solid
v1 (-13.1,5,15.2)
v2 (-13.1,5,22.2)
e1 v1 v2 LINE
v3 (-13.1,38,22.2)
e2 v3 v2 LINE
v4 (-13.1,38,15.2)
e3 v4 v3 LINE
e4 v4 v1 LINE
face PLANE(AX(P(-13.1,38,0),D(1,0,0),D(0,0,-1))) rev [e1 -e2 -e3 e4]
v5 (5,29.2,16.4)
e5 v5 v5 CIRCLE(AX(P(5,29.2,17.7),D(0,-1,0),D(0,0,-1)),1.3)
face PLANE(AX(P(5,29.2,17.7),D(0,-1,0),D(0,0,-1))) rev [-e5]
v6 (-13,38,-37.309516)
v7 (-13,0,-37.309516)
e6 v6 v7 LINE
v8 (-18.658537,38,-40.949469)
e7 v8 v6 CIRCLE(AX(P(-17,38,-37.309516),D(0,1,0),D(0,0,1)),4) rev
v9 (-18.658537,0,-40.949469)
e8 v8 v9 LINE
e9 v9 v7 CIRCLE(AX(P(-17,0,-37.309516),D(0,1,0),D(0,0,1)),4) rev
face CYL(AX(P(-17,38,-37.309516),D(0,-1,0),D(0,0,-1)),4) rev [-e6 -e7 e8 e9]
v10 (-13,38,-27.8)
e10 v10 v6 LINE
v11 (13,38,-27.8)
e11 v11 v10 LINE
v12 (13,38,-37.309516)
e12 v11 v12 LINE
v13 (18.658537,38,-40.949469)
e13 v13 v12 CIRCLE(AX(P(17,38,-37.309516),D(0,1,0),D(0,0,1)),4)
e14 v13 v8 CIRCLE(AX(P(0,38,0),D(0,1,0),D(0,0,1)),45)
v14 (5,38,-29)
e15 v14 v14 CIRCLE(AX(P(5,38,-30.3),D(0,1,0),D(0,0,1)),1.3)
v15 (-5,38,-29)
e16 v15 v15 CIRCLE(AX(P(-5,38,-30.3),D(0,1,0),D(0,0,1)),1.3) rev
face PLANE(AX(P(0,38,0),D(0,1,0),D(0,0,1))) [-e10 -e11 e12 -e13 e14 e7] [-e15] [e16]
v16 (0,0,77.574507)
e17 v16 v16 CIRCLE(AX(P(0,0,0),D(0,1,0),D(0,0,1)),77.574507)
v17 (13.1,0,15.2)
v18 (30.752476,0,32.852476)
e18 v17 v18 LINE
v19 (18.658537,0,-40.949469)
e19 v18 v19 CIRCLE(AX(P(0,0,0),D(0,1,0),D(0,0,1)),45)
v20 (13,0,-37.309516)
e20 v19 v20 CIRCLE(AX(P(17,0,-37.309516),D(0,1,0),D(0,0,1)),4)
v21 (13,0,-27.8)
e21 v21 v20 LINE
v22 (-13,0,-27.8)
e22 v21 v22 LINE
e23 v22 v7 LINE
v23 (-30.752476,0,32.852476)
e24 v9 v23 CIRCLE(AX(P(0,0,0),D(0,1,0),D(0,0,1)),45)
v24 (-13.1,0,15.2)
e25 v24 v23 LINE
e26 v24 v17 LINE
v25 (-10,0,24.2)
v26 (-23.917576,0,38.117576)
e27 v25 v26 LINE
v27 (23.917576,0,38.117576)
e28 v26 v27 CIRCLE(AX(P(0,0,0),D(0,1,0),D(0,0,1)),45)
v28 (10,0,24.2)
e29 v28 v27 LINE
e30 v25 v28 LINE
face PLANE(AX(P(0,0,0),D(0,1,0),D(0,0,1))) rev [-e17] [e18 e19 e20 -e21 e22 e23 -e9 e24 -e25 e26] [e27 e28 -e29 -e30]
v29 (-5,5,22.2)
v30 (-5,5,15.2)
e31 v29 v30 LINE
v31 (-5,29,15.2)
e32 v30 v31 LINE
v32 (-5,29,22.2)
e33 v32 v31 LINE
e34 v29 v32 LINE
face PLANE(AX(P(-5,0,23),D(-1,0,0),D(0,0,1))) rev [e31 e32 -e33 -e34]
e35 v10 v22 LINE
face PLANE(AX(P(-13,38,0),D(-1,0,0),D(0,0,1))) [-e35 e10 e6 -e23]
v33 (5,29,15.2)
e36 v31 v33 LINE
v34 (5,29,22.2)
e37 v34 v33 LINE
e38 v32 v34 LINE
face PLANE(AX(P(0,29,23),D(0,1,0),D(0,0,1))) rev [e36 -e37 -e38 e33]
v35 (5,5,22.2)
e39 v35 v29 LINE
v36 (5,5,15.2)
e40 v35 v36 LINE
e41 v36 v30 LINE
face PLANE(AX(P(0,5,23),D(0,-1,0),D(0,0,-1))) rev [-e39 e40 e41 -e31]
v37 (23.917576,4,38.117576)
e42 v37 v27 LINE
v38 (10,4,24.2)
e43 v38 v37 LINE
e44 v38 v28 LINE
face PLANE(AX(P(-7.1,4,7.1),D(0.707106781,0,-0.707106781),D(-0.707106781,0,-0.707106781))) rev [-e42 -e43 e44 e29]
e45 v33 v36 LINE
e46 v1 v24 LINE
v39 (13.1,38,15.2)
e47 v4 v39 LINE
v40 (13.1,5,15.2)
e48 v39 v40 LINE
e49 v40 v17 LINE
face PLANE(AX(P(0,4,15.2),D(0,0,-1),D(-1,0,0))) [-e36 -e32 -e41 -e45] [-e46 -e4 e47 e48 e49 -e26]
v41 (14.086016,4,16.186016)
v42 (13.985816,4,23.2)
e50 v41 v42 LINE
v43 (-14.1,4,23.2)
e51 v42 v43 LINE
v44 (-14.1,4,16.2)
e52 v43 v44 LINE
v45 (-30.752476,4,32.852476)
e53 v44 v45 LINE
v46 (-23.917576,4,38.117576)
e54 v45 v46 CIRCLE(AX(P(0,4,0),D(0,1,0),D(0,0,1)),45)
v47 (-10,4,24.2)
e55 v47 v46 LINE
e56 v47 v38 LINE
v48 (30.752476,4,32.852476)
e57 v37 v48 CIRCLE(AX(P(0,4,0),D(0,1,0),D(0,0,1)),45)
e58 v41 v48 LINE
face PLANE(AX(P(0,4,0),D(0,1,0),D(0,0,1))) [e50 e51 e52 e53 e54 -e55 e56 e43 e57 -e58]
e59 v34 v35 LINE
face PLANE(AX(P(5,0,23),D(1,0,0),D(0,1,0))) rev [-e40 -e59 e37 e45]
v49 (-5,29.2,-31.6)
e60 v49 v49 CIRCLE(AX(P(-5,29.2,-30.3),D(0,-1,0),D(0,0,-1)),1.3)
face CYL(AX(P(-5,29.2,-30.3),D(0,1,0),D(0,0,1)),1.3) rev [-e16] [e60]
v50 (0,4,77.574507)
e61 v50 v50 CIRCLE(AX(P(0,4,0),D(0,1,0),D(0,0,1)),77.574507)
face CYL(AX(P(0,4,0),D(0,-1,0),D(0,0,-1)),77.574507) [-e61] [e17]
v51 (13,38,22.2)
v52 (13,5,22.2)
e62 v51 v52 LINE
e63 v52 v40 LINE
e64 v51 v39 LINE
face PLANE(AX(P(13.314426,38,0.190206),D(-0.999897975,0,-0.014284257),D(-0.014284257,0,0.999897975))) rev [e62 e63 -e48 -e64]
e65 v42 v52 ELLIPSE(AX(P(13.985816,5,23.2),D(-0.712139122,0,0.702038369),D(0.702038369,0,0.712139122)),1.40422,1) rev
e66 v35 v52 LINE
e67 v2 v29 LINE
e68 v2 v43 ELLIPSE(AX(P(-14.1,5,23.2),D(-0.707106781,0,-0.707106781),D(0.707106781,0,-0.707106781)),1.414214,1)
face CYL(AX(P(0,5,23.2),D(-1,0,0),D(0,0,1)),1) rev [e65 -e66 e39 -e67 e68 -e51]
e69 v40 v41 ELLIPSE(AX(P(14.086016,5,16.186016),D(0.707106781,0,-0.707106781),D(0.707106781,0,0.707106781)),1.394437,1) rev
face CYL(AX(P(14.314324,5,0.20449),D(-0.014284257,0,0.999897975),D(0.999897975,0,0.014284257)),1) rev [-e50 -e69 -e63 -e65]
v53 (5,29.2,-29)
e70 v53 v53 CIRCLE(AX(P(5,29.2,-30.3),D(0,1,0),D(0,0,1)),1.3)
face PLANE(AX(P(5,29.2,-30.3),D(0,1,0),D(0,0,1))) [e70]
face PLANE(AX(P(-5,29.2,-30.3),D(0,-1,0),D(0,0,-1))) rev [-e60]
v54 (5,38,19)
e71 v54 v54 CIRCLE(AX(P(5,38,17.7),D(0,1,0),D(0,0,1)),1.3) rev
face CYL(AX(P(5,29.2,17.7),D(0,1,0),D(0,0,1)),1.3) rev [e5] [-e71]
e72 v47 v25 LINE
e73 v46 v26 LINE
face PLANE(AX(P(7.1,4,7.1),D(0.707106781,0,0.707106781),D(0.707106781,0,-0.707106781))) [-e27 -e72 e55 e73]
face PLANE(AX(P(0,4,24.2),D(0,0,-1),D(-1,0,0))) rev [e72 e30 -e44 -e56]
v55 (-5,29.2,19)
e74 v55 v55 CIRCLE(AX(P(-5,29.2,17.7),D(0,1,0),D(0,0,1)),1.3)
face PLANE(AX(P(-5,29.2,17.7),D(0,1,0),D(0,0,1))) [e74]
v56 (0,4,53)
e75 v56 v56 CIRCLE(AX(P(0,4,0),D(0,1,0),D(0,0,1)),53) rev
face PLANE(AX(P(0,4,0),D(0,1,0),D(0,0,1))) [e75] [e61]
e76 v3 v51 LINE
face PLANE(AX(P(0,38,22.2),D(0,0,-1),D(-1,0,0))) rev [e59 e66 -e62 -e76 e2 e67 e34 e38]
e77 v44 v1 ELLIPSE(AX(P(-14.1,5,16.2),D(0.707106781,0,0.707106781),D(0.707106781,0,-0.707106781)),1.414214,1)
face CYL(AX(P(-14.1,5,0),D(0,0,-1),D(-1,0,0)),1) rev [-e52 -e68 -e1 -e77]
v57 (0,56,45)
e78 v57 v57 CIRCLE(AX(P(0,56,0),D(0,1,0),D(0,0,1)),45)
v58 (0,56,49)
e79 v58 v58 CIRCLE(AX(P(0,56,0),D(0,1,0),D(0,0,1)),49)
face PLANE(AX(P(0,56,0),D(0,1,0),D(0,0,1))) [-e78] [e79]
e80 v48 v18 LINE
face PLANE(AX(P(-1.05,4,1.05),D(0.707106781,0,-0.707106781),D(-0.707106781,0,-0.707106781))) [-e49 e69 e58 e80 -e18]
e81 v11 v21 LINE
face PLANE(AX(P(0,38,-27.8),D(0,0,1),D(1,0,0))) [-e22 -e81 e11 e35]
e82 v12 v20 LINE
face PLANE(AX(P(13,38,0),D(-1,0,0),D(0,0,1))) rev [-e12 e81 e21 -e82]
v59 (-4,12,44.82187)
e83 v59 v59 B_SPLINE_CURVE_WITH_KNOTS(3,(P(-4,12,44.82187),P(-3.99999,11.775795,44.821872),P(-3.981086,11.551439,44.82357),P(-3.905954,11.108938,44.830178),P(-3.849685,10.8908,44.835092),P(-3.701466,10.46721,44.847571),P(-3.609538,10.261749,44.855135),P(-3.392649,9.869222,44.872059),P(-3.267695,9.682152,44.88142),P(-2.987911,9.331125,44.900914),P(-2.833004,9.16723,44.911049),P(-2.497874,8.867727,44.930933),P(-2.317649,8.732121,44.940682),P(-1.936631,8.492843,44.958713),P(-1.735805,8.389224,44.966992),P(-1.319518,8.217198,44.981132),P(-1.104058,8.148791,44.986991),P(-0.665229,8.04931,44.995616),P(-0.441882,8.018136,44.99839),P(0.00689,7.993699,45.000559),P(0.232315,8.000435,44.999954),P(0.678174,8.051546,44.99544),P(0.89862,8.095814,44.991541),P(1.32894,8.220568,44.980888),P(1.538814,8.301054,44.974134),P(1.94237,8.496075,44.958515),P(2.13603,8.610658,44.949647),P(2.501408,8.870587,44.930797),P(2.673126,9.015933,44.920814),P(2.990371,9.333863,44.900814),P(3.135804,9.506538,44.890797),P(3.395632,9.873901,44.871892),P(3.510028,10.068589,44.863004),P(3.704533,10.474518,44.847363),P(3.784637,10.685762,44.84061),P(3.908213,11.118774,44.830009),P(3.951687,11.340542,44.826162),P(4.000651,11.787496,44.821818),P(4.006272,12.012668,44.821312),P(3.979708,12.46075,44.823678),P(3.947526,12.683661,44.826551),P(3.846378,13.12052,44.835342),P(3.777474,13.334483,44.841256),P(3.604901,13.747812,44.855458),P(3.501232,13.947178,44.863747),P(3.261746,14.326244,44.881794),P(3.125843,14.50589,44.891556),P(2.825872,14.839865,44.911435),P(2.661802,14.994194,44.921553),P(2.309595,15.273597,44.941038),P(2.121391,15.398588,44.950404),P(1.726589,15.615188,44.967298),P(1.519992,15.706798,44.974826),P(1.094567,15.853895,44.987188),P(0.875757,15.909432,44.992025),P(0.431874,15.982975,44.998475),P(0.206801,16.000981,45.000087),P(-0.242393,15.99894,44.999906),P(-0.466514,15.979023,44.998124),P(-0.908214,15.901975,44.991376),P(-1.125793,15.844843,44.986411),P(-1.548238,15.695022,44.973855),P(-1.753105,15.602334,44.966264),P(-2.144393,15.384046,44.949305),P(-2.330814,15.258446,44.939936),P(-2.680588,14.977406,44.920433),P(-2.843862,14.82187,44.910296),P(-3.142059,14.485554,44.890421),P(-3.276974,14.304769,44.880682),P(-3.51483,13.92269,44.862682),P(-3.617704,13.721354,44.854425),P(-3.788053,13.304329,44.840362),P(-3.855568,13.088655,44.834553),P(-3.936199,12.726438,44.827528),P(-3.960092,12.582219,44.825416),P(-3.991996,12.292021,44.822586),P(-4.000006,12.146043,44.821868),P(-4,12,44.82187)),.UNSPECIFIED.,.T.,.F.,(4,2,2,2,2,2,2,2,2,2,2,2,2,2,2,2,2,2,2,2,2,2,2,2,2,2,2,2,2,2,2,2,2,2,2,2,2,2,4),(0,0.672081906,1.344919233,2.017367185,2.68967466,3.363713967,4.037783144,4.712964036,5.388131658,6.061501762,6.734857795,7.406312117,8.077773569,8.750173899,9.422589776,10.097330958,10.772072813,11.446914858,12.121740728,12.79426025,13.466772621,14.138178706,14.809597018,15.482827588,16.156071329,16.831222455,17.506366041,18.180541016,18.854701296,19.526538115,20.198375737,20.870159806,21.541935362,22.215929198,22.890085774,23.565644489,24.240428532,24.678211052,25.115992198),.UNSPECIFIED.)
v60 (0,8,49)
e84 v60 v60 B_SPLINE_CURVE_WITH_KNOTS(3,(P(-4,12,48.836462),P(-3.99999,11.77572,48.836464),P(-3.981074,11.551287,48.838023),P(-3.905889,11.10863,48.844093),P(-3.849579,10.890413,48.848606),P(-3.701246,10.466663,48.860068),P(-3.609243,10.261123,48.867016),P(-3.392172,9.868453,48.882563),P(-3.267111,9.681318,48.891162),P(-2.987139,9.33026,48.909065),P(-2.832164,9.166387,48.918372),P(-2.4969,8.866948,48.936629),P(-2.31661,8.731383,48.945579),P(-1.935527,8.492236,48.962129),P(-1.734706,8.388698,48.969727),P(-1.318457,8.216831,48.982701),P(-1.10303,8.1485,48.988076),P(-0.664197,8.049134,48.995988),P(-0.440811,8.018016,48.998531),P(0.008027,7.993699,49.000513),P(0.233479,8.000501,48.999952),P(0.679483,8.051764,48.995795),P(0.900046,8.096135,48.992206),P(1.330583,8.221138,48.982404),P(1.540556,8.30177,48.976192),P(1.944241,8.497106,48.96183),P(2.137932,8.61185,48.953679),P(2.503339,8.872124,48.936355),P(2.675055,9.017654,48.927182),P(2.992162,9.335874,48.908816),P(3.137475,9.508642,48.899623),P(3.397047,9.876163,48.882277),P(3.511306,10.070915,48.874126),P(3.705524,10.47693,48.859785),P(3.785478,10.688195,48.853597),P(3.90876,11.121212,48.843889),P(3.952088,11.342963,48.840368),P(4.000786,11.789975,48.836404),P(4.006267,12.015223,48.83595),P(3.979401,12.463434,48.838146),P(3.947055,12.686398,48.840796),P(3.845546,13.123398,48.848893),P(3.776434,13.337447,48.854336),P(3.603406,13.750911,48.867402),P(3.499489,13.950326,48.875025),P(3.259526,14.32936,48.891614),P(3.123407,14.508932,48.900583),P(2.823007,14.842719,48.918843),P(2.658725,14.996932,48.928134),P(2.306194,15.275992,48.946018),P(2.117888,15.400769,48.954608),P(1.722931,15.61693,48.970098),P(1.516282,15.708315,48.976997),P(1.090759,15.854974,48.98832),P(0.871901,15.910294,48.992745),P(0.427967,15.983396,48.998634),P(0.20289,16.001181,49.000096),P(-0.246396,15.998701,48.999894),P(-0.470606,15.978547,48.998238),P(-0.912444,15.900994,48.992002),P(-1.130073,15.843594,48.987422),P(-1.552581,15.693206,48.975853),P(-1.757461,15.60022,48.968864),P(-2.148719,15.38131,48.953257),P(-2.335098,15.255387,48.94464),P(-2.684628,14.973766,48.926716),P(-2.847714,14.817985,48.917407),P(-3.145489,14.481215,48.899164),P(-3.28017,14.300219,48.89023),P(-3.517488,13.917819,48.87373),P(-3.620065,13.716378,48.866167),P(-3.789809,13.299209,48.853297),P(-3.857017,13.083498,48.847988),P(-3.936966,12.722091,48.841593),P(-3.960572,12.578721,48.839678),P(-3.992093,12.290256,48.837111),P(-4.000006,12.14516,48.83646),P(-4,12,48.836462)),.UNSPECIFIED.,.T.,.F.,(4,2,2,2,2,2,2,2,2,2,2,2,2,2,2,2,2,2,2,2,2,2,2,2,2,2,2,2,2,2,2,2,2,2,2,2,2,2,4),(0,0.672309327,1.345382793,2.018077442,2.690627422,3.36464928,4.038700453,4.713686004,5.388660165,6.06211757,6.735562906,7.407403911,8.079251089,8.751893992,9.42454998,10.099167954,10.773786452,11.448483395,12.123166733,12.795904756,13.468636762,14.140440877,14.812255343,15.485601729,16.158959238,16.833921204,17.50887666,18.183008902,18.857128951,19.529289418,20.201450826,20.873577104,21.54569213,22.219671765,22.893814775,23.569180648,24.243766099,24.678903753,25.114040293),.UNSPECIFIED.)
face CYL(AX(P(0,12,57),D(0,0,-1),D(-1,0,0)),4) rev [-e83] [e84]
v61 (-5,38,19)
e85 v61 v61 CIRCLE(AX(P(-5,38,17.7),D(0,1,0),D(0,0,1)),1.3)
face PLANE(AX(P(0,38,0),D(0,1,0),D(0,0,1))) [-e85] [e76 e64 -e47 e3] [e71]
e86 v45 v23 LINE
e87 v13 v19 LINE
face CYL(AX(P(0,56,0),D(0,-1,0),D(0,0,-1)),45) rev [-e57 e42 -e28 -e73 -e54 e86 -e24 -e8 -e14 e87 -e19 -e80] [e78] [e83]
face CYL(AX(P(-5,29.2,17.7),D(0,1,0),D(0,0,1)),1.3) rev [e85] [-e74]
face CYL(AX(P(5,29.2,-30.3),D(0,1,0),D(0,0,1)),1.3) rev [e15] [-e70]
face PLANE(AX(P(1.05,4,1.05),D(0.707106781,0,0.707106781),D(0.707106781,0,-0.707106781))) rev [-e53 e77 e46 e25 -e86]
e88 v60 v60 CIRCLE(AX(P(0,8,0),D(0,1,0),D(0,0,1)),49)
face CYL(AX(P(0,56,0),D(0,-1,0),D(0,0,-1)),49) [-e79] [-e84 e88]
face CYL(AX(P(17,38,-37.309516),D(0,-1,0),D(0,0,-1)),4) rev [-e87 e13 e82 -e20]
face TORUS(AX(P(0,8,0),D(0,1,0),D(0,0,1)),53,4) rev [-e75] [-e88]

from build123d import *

# Parameters (mm, degrees)
CROQUIS3_R              = 49
CROQUIS3_R_2            = 45
SALIENTE_EXTRUIR1_DEPTH = 56
CROQUIS1_R              = 77.574507489
SALIENTE_EXTRUIR2_DEPTH = 4
SALIENTE_EXTRUIR3_DEPTH = 38
CORTAR_EXTRUIR1_DEPTH   = 8
CROQUIS7_R              = 4
CORTAR_EXTRUIR2_DEPTH   = 42
REDONDEO1_R             = 4
REDONDEO2_R             = 1
CROQUIS8_R              = 1.3
CORTAR_EXTRUIR3_DEPTH   = 30.8


with BuildPart() as part:
    # Croquis3 → Saliente-Extruir1 (new body)
    with BuildSketch(Plane(origin=(0, 0, 0), x_dir=(1, 0, 0), z_dir=(0, 1, 0))):
        with Locations(Location((0, 0, 0), (0, 0, 270))):
            Circle(CROQUIS3_R)
        with Locations(Location((0, 0, 0), (0, 0, 270))):
            Circle(CROQUIS3_R_2, mode=Mode.SUBTRACT)
    extrude(amount=SALIENTE_EXTRUIR1_DEPTH)

    # Croquis1 → Saliente-Extruir2 (add)
    with BuildSketch(Plane(origin=(0, 0, 0), x_dir=(1, 0, 0), z_dir=(0, 1, 0))):
        with Locations(Location((0, 0, 0), (0, 0, 270))):
            Circle(CROQUIS1_R)
        with BuildLine():
            Line((-23.917575663, -38.117575663), (-10, -24.2))
            Line((-10, -24.2), (0, -24.2))
            Line((0, -24.2), (10, -24.2))
            Line((10, -24.2), (23.917575663, -38.117575663))
            ThreePointArc((23.917575663, -38.117575663), (12.444056717, -43.245178372), (0, -45))
            ThreePointArc((0, -45), (-6.760954384, -44.489206509), (-13.368422036, -42.968422036))
            ThreePointArc((-13.368422036, -42.968422036), (-15.776603613, -42.143786949), (-18.134305032, -41.184305032))
            ThreePointArc((-18.134305032, -41.184305032), (-21.081778264, -39.756240079), (-23.917575663, -38.117575663))
        make_face(mode=Mode.SUBTRACT)
        with BuildLine():
            Line((13.1, -15.2), (0, -15.2))
            Line((0, -15.2), (-13.1, -15.2))
            Line((-13.1, -15.2), (-30.752476319, -32.852476319))
            ThreePointArc((-30.752476319, -32.852476319), (-7.771708829, 44.323814613), (40.095012748, -20.430123659))
            ThreePointArc((40.095012748, -20.430123659), (37.628495356, -24.679877173), (34.713332708, -28.635372048))
            ThreePointArc((34.713332708, -28.635372048), (32.8007474, -30.807644668), (30.752476319, -32.852476319))
            Line((30.752476319, -32.852476319), (13.1, -15.2))
        make_face(mode=Mode.SUBTRACT)
    extrude(amount=SALIENTE_EXTRUIR2_DEPTH)

    # Croquis5 → Saliente-Extruir3 (add)
    with BuildSketch(Plane(origin=(0, 0, 0), x_dir=(1, 0, 0), z_dir=(0, 1, 0))):
        with BuildLine():
            ThreePointArc((18.658536585, 40.949469014), (14.835992877, 40.673601998), (13, 37.309516212))
            Line((13, 37.309516212), (13, 27.8))
            Line((13, 27.8), (0, 27.8))
            Line((0, 27.8), (-13, 27.8))
            Line((-13, 27.8), (-13, 37.309516212))
            ThreePointArc((-13, 37.309516212), (-14.835992877, 40.673601998), (-18.658536585, 40.949469014))
            ThreePointArc((-18.658536585, 40.949469014), (0, 45), (18.658536585, 40.949469014))
        make_face()
        Polygon((-13.1, -15.2), (13.1, -15.2), (13, -22.2), (-13.1, -22.2), align=None)
    extrude(amount=SALIENTE_EXTRUIR3_DEPTH)

    # Croquis6 → Cortar-Extruir1 (cut)
    with BuildSketch(Plane.XY.offset(15)):
        Polygon((5, 5), (0, 5), (-5, 5), (-5, 29), (-2.492829293, 29), (5, 29), align=None)
    extrude(amount=CORTAR_EXTRUIR1_DEPTH, mode=Mode.SUBTRACT)

    # Croquis7 → Cortar-Extruir2 (cut)
    with BuildSketch(Plane.XY.offset(15)):
        with Locations(Location((0, 12, 0), (0, 0, 180))):
            Circle(CROQUIS7_R)
    extrude(amount=CORTAR_EXTRUIR2_DEPTH, mode=Mode.SUBTRACT)

    # Redondeo1
    redondeo1_edges = [part.edges().sort_by_distance(p)[0] for p in [
        (0, 4, -49),
    ]]
    fillet(redondeo1_edges, radius=REDONDEO1_R)

    # Redondeo2
    # the kernel refuses this fillet: 1 mm, written as the material it adds along each edge
    with BuildSketch(Plane(origin=(-13.1, 4, 22.2), x_dir=(0, 0, 1), z_dir=(1, 0, 0))) as redondeo2_piece_1_section:
        with BuildLine():
            CenterArc((REDONDEO2_R, -REDONDEO2_R), REDONDEO2_R, 90, 90)
            Line((0, -REDONDEO2_R), (0, 0))
            Line((0, 0), (REDONDEO2_R, 0))
        make_face()
    redondeo2_piece_1 = extrude(amount=28.6, mode=Mode.PRIVATE)
    redondeo2_piece_1 = split(redondeo2_piece_1, bisect_by=Plane(origin=(12.992267362, 4.226395114, 22.741284648), z_dir=(-0.99989797479951, 0, -0.014284256782850096)), keep=Keep.TOP, mode=Mode.PRIVATE)
    add(redondeo2_piece_1)
    with BuildSketch(Plane(origin=(12.964289358, 4, 24.699744937), x_dir=(0.99989797479951, 0, 0.014284256782850096), z_dir=(0.014284256782850096, 0, -0.99989797479951))) as redondeo2_piece_2_section:
        with BuildLine():
            CenterArc((REDONDEO2_R, -REDONDEO2_R), REDONDEO2_R, 90, 90)
            Line((0, -REDONDEO2_R), (0, 0))
            Line((0, 0), (REDONDEO2_R, 0))
        make_face()
    redondeo2_piece_2 = extrude(amount=12.000714249, mode=Mode.PRIVATE)
    redondeo2_piece_2 = split(redondeo2_piece_2, bisect_by=Plane(origin=(14.988415496, 4.230359827, 17.088415496), z_dir=(-0.7071067811865411, 0, 0.7071067811865539)), keep=Keep.TOP, mode=Mode.PRIVATE)
    redondeo2_piece_2 = split(redondeo2_piece_2, bisect_by=Plane(origin=(13.268129446, 4.230359827, 15.2), z_dir=(0, 0, 1)), keep=Keep.TOP, mode=Mode.PRIVATE)
    redondeo2_piece_2 = split(redondeo2_piece_2, bisect_by=Plane(origin=(13.268129446, 4.230359827, 22.2), z_dir=(0, 0, -1)), keep=Keep.TOP, mode=Mode.PRIVATE)
    add(redondeo2_piece_2)
    with BuildSketch(Plane(origin=(-13.1, 4, 15.2), x_dir=(-1, 0, 0), z_dir=(0, 0, 1))) as redondeo2_piece_3_section:
        with BuildLine():
            CenterArc((REDONDEO2_R, -REDONDEO2_R), REDONDEO2_R, 90, 90)
            Line((0, -REDONDEO2_R), (0, 0))
            Line((0, 0), (REDONDEO2_R, 0))
        make_face()
    redondeo2_piece_3 = extrude(amount=7, mode=Mode.PRIVATE)
    redondeo2_piece_3 = split(redondeo2_piece_3, bisect_by=Plane(origin=(-15.014877598, 4.230417942, 17.114877598), z_dir=(0.7071067811865538, 0, 0.7071067811865414)), keep=Keep.TOP, mode=Mode.PRIVATE)
    add(redondeo2_piece_3)
    with BuildSketch(Plane(origin=(-13.1, 4, 15.2), x_dir=(-1, 0, 0), z_dir=(0, 0, 1))) as redondeo2_piece_4a_section:
        with BuildLine():
            CenterArc((REDONDEO2_R, -REDONDEO2_R), REDONDEO2_R, 90, 90)
            Line((0, -REDONDEO2_R), (0, 0))
            Line((0, 0), (REDONDEO2_R, 0))
        make_face()
    redondeo2_piece_4a = extrude(amount=9.5, mode=Mode.PRIVATE)
    redondeo2_piece_4a = split(redondeo2_piece_4a, bisect_by=Plane(origin=(-13.326395114, 4.226395114, 22.2), z_dir=(0, 0, 1)), keep=Keep.TOP, mode=Mode.PRIVATE)
    with BuildSketch(Plane(origin=(-15.6, 4, 22.2), x_dir=(0, 0, 1), z_dir=(1, 0, 0))) as redondeo2_piece_4b_section:
        with BuildLine():
            CenterArc((REDONDEO2_R, -REDONDEO2_R), REDONDEO2_R, 90, 90)
            Line((0, -REDONDEO2_R), (0, 0))
            Line((0, 0), (REDONDEO2_R, 0))
        make_face()
    redondeo2_piece_4b = extrude(amount=31.1, mode=Mode.PRIVATE)
    redondeo2_piece_4b = split(redondeo2_piece_4b, bisect_by=Plane(origin=(-13.1, 4.226395114, 22.426395114), z_dir=(-1, 0, 0)), keep=Keep.TOP, mode=Mode.PRIVATE)
    redondeo2_piece_4 = redondeo2_piece_4a & redondeo2_piece_4b
    add(redondeo2_piece_4)
    with BuildSketch(Plane(origin=(-13.1, 4, 22.2), x_dir=(0, 0, 1), z_dir=(1, 0, 0))) as redondeo2_piece_5a_section:
        with BuildLine():
            CenterArc((REDONDEO2_R, -REDONDEO2_R), REDONDEO2_R, 90, 90)
            Line((0, -REDONDEO2_R), (0, 0))
            Line((0, 0), (REDONDEO2_R, 0))
        make_face()
    redondeo2_piece_5a = extrude(amount=28.6, mode=Mode.PRIVATE)
    redondeo2_piece_5a = split(redondeo2_piece_5a, bisect_by=Plane(origin=(12.997017375, 4.226238422, 22.408783729), z_dir=(0.99989797479951, 0, 0.014284256782850096)), keep=Keep.TOP, mode=Mode.PRIVATE)
    with BuildSketch(Plane(origin=(12.964289358, 4, 24.699744937), x_dir=(0.99989797479951, 0, 0.014284256782850096), z_dir=(0.014284256782850096, 0, -0.99989797479951))) as redondeo2_piece_5b_section:
        with BuildLine():
            CenterArc((REDONDEO2_R, -REDONDEO2_R), REDONDEO2_R, 90, 90)
            Line((0, -REDONDEO2_R), (0, 0))
            Line((0, 0), (REDONDEO2_R, 0))
        make_face()
    redondeo2_piece_5b = extrude(amount=12.000714249, mode=Mode.PRIVATE)
    redondeo2_piece_5b = split(redondeo2_piece_5b, bisect_by=Plane(origin=(13.208805032, 4.226238422, 22.2), z_dir=(0, 0, 1)), keep=Keep.TOP, mode=Mode.PRIVATE)
    redondeo2_piece_5 = redondeo2_piece_5a & redondeo2_piece_5b
    add(redondeo2_piece_5)

    # Croquis8 → Cortar-Extruir3 (cut)
    with BuildSketch(Plane(origin=(0, 60, 0), x_dir=(1, 0, 0), z_dir=(0, 1, 0))):
        with Locations(Location((-5, -17.7, 0), (0, 0, 270))):
            Circle(CROQUIS8_R)
        with Locations(Location((5, -17.7, 0), (0, 0, 270))):
            Circle(CROQUIS8_R)
        with Locations(Location((5, 30.3, 0), (0, 0, 270))):
            Circle(CROQUIS8_R)
        with Locations(Location((-5, 30.3, 0), (0, 0, 270))):
            Circle(CROQUIS8_R)
    extrude(amount=-CORTAR_EXTRUIR3_DEPTH, mode=Mode.SUBTRACT)


solid = part.part
